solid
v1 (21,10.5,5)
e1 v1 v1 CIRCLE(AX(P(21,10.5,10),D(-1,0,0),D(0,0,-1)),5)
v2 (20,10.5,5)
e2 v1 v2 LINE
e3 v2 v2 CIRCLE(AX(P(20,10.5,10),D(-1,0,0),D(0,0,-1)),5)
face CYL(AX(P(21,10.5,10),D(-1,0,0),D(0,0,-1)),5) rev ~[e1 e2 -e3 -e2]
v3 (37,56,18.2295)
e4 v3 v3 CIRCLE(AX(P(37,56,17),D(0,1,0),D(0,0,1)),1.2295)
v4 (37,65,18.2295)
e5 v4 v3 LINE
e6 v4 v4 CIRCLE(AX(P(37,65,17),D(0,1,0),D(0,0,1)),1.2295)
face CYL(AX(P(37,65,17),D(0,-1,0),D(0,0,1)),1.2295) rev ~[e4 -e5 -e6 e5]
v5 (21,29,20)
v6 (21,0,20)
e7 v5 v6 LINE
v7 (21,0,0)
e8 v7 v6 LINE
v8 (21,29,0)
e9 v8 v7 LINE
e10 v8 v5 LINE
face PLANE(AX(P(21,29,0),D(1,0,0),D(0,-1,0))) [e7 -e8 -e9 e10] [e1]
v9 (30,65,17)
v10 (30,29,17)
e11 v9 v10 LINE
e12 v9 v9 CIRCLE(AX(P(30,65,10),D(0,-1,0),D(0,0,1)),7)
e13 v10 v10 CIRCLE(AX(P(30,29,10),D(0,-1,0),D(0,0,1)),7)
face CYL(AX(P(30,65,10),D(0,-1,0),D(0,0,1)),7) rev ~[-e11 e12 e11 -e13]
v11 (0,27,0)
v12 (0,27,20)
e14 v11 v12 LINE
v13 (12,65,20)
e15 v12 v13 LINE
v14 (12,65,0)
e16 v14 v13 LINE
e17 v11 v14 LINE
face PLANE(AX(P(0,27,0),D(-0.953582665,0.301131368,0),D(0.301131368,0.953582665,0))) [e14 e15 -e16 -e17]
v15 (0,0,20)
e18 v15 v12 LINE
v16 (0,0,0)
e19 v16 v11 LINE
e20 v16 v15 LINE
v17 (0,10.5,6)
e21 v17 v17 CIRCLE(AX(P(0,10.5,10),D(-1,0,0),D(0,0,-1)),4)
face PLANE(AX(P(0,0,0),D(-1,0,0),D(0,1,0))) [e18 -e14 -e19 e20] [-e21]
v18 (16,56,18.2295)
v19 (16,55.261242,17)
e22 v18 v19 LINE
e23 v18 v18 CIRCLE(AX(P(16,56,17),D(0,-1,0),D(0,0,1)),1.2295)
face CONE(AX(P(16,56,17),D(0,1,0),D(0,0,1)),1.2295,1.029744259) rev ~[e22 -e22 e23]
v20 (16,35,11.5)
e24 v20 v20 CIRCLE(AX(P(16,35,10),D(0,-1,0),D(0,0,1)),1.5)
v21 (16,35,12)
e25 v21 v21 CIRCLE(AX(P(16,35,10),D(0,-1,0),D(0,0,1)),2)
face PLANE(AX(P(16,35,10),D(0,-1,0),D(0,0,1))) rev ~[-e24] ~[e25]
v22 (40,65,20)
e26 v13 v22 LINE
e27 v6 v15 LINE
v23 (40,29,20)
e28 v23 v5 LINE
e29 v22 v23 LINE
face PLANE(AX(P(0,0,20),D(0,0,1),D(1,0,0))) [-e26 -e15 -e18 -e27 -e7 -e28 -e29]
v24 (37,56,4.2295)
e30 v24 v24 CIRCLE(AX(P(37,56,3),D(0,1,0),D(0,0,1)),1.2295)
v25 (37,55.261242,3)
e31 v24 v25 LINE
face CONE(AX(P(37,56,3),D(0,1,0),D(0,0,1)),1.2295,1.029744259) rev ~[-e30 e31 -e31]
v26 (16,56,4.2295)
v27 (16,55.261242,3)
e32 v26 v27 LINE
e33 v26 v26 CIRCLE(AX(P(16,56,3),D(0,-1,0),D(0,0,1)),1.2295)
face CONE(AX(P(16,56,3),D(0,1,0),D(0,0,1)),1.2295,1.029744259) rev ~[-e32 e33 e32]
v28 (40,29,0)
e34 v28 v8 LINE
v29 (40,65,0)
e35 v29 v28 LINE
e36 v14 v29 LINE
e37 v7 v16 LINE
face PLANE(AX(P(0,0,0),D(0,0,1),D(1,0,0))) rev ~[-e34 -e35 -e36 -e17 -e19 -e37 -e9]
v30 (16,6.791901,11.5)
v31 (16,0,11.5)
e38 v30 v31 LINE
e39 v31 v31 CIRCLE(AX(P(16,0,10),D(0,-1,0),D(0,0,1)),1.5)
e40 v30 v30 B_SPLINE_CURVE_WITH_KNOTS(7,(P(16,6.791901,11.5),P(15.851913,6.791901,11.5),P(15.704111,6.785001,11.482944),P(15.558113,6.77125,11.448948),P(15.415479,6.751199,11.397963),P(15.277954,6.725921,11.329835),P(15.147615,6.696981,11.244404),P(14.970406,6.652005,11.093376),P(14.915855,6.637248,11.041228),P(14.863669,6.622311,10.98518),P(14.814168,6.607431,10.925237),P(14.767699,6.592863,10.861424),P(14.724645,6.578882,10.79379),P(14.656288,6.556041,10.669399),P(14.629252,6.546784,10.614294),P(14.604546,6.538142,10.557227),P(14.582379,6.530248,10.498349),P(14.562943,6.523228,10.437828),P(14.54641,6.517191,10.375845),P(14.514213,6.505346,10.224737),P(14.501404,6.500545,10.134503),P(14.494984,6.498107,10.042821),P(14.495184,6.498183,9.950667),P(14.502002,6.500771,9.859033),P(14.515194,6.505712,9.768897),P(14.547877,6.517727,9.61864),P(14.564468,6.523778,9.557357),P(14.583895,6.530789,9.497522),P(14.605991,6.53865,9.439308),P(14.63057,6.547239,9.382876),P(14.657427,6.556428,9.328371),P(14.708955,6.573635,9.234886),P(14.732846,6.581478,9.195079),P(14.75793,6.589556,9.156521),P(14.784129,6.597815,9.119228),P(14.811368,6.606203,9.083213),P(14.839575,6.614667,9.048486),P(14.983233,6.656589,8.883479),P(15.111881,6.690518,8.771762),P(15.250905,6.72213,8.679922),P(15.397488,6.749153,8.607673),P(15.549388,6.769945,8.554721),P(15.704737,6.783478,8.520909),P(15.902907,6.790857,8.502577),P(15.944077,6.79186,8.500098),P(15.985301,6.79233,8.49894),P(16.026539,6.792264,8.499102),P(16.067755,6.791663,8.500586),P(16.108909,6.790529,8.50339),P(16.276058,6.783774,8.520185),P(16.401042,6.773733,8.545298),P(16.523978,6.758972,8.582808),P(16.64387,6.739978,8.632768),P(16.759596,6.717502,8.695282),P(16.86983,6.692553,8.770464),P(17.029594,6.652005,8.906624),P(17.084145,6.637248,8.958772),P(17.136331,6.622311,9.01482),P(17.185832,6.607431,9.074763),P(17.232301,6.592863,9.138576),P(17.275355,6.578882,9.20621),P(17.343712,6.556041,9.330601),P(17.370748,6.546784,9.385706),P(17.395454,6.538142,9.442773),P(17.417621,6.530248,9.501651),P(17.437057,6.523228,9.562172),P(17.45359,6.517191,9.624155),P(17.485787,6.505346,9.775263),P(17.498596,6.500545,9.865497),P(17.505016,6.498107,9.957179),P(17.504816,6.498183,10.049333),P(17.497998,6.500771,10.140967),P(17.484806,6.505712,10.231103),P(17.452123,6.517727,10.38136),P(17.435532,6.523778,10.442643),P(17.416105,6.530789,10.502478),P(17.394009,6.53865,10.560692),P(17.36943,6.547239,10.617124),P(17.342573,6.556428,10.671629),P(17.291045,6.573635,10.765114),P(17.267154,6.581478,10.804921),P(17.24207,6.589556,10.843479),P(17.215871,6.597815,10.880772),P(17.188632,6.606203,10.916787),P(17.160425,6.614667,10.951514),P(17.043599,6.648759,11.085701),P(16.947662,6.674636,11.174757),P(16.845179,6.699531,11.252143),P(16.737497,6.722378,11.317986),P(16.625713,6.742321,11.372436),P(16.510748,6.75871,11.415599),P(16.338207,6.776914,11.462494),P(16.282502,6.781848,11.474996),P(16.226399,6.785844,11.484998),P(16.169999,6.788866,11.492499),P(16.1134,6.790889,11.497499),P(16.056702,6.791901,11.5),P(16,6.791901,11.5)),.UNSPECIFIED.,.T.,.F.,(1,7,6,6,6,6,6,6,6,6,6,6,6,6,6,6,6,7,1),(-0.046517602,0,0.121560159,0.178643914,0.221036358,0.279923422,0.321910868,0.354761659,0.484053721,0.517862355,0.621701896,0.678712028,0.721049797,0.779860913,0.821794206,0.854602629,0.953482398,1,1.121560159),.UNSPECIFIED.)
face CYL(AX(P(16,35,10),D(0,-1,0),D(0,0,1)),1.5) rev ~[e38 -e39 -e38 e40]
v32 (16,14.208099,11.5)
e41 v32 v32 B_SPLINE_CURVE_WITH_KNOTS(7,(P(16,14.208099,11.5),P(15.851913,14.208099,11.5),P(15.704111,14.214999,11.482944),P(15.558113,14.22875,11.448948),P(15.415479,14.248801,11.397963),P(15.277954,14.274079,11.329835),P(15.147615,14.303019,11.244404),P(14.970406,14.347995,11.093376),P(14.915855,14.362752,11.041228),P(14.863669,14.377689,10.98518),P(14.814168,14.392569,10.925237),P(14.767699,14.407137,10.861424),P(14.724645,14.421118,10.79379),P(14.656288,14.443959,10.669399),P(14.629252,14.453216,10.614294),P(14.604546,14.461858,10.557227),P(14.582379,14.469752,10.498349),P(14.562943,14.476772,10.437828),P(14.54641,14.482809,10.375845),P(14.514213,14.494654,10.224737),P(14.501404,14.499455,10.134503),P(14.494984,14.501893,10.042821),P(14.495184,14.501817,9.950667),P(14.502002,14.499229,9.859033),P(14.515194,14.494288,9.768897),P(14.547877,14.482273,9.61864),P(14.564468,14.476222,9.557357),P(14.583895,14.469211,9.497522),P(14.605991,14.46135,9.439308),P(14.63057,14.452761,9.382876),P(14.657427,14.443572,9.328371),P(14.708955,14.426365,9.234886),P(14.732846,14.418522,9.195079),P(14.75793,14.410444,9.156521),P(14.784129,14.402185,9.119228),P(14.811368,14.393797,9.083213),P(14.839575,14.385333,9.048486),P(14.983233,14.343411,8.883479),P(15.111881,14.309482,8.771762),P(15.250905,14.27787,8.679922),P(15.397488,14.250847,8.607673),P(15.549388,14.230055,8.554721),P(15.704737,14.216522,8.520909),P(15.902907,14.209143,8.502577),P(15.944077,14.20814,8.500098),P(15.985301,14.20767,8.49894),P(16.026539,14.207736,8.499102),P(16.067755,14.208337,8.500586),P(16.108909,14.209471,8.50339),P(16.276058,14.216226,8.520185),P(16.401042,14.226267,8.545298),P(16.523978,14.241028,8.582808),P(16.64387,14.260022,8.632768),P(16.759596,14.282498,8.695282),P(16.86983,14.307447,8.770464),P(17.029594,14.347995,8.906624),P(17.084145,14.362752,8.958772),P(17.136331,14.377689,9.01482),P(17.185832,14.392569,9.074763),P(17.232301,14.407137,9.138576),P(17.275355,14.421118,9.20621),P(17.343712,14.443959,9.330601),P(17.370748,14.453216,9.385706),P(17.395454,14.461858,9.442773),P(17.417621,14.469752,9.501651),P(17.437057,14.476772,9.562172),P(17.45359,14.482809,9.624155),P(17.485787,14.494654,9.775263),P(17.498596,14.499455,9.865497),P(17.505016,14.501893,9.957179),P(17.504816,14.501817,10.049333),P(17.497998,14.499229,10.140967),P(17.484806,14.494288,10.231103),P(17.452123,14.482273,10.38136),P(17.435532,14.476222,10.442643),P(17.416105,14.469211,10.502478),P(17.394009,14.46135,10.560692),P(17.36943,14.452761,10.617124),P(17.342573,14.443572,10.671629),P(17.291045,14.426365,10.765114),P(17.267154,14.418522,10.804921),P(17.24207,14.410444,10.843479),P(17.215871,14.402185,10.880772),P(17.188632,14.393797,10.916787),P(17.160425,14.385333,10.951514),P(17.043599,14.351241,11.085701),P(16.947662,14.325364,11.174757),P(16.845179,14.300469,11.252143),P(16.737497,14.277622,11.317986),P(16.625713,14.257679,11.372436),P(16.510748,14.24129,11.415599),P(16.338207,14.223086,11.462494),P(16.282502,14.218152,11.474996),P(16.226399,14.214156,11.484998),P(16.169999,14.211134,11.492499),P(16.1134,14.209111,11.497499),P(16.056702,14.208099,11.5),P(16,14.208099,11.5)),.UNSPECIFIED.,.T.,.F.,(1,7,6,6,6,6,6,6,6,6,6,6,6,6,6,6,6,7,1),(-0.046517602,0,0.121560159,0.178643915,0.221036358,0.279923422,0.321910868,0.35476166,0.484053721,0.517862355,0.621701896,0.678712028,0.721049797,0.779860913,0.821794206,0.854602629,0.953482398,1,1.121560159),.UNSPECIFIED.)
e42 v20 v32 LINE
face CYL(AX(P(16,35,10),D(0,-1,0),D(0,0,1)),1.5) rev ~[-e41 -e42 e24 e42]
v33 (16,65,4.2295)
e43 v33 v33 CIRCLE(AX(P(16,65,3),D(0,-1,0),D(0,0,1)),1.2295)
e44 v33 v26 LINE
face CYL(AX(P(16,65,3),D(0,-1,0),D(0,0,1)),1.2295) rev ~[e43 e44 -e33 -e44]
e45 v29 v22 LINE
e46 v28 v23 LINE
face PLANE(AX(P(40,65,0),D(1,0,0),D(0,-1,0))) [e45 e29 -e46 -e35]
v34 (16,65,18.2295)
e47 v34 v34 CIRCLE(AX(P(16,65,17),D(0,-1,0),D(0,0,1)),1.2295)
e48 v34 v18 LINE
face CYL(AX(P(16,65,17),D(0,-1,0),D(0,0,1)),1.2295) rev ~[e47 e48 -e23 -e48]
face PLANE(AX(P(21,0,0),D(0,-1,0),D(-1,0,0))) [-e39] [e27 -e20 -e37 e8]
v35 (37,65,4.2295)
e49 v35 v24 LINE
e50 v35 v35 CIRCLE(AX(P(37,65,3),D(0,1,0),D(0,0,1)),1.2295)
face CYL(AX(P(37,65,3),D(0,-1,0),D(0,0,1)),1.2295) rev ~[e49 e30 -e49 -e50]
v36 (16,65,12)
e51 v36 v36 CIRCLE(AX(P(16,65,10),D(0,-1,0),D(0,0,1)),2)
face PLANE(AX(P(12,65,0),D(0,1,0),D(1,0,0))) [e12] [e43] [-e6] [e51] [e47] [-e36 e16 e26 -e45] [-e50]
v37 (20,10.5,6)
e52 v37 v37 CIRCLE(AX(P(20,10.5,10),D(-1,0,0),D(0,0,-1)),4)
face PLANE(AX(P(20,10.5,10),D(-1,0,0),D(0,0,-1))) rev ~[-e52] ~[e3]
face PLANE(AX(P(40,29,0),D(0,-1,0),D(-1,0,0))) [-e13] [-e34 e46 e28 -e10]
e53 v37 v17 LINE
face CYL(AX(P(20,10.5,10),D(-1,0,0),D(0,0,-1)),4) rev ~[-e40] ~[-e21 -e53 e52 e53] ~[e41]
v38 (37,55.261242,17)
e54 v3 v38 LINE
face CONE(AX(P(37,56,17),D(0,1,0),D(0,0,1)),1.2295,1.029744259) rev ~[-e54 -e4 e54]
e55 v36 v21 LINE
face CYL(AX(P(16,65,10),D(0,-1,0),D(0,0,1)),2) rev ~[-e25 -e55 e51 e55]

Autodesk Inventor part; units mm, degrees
ref_plane "XY Plane" through (0, 0, 0) normal (0, 0, 1) x (1, 0, 0)
sketch "Skizze1" plane through (0, 0, 0) normal (0, 0, 1) x (1, 0, 0)
  line L0 (0, 0) -> (0, 27)
  line L1 (0, 27) -> (12, 65)
  line L2 (12, 65) -> (40, 65)
  line L3 (40, 65) -> (40, 29)
  line L4 (40, 29) -> (21, 29)
  line L5 (21, 29) -> (21, 0)
  line L6 (21, 0) -> (0, 0)
  dimension "d0" = 65
  dimension "d1" = 21
  dimension "d2" = 29
  dimension "d3" = 38
  dimension "d4" = 28
  dimension "d5" = 12
extrude "Extrusion1" add sketch "Skizze1" along normal blind 20
sketch "Skizze3" plane through (12, 65, 0) normal (0, 1, 0) x (1, 0, 0)
  line L0 (0, 0) -> (0, -20) projected
  line L1 (28, 0) -> (28, -20) projected
  point P0 (-12, 0)
  point P1 (18, -10)
  point P2 (28, -10)
  dimension "d16" = 10
hole "Bohrung2" at (30, 65, 10) direction (0, -1, 0) diameter 14 end through all
sketch "Skizze4" plane through (12, 65, 0) normal (0, 1, 0) x (1, 0, 0)
  line L0 (0, 0) -> (0, -20) projected
  line L1 (28, 0) -> (28, -20) projected
  point P0 (-12, 0)
  point P1 (4, -10)
  point P2 (28, -10)
  dimension "d24" = 4
hole "Bohrung3" at (16, 65, 10) direction (0, -1, 0) diameter 3 depth 65 counterbore diameter 4 counterbore depth 30
sketch "Skizze5" plane through (21, 0, 0) normal (1, 0, 0) x (0, 0, -1)
  line L0 (0, 0) -> (-20, 0) projected
  point P0 (-10, 10.5)
  point P1 (-10, 0)
  dimension "d32" = 10.5
hole "Bohrung4" at (21, 10.5, 10) direction (-1, 0, 0) diameter 8 depth 21 counterbore diameter 10 counterbore depth 1
ref_plane "Arbeitsebene1" through (0, 12, 0) normal (0, 1, 0) x (-1, 0, 0)
sketch "Skizze8" plane through (12, 65, 0) normal (0, 1, 0) x (1, 0, 0)
  circle A0 centre (4, -10) radius 2 projected
  circle A1 centre (18, -10) radius 7 projected
  line L0 (28, 0) -> (0, 0) projected
  line L1 (0, 0) -> (0, -20) projected
  line L2 (28, -20) -> (0, -20) projected
  line L3 (28, 0) -> (28, -20) projected
  line L4 (4, -10) -> (4, -3) construction
  line L5 (4, -10) -> (4, -17) construction
  line L6 (18, -10) -> (9, -10) construction
  line L7 (9, 0) -> (9, -20) projected
  point P0 (-12, 0)
  dimension "d57" = 14
hole "Bohrung7" at (16, 65, 17) at (16, 65, 3) direction (0, -1, 0) diameter 2.459 depth 9 tip angle 118 thread size "M3x0.5" class "6H" standard "ISO Metric profile"
ref_plane "Arbeitsebene2" through (26.5, 0, 0) normal (1, 0, 0) x (0, 1, 0)
mirror "Spiegeln2" about plane through (26.5, 0, 0) normal (1, 0, 0) of "Bohrung7"
properties part number "MotorBlock" material "Stahl, galvanisiert"
